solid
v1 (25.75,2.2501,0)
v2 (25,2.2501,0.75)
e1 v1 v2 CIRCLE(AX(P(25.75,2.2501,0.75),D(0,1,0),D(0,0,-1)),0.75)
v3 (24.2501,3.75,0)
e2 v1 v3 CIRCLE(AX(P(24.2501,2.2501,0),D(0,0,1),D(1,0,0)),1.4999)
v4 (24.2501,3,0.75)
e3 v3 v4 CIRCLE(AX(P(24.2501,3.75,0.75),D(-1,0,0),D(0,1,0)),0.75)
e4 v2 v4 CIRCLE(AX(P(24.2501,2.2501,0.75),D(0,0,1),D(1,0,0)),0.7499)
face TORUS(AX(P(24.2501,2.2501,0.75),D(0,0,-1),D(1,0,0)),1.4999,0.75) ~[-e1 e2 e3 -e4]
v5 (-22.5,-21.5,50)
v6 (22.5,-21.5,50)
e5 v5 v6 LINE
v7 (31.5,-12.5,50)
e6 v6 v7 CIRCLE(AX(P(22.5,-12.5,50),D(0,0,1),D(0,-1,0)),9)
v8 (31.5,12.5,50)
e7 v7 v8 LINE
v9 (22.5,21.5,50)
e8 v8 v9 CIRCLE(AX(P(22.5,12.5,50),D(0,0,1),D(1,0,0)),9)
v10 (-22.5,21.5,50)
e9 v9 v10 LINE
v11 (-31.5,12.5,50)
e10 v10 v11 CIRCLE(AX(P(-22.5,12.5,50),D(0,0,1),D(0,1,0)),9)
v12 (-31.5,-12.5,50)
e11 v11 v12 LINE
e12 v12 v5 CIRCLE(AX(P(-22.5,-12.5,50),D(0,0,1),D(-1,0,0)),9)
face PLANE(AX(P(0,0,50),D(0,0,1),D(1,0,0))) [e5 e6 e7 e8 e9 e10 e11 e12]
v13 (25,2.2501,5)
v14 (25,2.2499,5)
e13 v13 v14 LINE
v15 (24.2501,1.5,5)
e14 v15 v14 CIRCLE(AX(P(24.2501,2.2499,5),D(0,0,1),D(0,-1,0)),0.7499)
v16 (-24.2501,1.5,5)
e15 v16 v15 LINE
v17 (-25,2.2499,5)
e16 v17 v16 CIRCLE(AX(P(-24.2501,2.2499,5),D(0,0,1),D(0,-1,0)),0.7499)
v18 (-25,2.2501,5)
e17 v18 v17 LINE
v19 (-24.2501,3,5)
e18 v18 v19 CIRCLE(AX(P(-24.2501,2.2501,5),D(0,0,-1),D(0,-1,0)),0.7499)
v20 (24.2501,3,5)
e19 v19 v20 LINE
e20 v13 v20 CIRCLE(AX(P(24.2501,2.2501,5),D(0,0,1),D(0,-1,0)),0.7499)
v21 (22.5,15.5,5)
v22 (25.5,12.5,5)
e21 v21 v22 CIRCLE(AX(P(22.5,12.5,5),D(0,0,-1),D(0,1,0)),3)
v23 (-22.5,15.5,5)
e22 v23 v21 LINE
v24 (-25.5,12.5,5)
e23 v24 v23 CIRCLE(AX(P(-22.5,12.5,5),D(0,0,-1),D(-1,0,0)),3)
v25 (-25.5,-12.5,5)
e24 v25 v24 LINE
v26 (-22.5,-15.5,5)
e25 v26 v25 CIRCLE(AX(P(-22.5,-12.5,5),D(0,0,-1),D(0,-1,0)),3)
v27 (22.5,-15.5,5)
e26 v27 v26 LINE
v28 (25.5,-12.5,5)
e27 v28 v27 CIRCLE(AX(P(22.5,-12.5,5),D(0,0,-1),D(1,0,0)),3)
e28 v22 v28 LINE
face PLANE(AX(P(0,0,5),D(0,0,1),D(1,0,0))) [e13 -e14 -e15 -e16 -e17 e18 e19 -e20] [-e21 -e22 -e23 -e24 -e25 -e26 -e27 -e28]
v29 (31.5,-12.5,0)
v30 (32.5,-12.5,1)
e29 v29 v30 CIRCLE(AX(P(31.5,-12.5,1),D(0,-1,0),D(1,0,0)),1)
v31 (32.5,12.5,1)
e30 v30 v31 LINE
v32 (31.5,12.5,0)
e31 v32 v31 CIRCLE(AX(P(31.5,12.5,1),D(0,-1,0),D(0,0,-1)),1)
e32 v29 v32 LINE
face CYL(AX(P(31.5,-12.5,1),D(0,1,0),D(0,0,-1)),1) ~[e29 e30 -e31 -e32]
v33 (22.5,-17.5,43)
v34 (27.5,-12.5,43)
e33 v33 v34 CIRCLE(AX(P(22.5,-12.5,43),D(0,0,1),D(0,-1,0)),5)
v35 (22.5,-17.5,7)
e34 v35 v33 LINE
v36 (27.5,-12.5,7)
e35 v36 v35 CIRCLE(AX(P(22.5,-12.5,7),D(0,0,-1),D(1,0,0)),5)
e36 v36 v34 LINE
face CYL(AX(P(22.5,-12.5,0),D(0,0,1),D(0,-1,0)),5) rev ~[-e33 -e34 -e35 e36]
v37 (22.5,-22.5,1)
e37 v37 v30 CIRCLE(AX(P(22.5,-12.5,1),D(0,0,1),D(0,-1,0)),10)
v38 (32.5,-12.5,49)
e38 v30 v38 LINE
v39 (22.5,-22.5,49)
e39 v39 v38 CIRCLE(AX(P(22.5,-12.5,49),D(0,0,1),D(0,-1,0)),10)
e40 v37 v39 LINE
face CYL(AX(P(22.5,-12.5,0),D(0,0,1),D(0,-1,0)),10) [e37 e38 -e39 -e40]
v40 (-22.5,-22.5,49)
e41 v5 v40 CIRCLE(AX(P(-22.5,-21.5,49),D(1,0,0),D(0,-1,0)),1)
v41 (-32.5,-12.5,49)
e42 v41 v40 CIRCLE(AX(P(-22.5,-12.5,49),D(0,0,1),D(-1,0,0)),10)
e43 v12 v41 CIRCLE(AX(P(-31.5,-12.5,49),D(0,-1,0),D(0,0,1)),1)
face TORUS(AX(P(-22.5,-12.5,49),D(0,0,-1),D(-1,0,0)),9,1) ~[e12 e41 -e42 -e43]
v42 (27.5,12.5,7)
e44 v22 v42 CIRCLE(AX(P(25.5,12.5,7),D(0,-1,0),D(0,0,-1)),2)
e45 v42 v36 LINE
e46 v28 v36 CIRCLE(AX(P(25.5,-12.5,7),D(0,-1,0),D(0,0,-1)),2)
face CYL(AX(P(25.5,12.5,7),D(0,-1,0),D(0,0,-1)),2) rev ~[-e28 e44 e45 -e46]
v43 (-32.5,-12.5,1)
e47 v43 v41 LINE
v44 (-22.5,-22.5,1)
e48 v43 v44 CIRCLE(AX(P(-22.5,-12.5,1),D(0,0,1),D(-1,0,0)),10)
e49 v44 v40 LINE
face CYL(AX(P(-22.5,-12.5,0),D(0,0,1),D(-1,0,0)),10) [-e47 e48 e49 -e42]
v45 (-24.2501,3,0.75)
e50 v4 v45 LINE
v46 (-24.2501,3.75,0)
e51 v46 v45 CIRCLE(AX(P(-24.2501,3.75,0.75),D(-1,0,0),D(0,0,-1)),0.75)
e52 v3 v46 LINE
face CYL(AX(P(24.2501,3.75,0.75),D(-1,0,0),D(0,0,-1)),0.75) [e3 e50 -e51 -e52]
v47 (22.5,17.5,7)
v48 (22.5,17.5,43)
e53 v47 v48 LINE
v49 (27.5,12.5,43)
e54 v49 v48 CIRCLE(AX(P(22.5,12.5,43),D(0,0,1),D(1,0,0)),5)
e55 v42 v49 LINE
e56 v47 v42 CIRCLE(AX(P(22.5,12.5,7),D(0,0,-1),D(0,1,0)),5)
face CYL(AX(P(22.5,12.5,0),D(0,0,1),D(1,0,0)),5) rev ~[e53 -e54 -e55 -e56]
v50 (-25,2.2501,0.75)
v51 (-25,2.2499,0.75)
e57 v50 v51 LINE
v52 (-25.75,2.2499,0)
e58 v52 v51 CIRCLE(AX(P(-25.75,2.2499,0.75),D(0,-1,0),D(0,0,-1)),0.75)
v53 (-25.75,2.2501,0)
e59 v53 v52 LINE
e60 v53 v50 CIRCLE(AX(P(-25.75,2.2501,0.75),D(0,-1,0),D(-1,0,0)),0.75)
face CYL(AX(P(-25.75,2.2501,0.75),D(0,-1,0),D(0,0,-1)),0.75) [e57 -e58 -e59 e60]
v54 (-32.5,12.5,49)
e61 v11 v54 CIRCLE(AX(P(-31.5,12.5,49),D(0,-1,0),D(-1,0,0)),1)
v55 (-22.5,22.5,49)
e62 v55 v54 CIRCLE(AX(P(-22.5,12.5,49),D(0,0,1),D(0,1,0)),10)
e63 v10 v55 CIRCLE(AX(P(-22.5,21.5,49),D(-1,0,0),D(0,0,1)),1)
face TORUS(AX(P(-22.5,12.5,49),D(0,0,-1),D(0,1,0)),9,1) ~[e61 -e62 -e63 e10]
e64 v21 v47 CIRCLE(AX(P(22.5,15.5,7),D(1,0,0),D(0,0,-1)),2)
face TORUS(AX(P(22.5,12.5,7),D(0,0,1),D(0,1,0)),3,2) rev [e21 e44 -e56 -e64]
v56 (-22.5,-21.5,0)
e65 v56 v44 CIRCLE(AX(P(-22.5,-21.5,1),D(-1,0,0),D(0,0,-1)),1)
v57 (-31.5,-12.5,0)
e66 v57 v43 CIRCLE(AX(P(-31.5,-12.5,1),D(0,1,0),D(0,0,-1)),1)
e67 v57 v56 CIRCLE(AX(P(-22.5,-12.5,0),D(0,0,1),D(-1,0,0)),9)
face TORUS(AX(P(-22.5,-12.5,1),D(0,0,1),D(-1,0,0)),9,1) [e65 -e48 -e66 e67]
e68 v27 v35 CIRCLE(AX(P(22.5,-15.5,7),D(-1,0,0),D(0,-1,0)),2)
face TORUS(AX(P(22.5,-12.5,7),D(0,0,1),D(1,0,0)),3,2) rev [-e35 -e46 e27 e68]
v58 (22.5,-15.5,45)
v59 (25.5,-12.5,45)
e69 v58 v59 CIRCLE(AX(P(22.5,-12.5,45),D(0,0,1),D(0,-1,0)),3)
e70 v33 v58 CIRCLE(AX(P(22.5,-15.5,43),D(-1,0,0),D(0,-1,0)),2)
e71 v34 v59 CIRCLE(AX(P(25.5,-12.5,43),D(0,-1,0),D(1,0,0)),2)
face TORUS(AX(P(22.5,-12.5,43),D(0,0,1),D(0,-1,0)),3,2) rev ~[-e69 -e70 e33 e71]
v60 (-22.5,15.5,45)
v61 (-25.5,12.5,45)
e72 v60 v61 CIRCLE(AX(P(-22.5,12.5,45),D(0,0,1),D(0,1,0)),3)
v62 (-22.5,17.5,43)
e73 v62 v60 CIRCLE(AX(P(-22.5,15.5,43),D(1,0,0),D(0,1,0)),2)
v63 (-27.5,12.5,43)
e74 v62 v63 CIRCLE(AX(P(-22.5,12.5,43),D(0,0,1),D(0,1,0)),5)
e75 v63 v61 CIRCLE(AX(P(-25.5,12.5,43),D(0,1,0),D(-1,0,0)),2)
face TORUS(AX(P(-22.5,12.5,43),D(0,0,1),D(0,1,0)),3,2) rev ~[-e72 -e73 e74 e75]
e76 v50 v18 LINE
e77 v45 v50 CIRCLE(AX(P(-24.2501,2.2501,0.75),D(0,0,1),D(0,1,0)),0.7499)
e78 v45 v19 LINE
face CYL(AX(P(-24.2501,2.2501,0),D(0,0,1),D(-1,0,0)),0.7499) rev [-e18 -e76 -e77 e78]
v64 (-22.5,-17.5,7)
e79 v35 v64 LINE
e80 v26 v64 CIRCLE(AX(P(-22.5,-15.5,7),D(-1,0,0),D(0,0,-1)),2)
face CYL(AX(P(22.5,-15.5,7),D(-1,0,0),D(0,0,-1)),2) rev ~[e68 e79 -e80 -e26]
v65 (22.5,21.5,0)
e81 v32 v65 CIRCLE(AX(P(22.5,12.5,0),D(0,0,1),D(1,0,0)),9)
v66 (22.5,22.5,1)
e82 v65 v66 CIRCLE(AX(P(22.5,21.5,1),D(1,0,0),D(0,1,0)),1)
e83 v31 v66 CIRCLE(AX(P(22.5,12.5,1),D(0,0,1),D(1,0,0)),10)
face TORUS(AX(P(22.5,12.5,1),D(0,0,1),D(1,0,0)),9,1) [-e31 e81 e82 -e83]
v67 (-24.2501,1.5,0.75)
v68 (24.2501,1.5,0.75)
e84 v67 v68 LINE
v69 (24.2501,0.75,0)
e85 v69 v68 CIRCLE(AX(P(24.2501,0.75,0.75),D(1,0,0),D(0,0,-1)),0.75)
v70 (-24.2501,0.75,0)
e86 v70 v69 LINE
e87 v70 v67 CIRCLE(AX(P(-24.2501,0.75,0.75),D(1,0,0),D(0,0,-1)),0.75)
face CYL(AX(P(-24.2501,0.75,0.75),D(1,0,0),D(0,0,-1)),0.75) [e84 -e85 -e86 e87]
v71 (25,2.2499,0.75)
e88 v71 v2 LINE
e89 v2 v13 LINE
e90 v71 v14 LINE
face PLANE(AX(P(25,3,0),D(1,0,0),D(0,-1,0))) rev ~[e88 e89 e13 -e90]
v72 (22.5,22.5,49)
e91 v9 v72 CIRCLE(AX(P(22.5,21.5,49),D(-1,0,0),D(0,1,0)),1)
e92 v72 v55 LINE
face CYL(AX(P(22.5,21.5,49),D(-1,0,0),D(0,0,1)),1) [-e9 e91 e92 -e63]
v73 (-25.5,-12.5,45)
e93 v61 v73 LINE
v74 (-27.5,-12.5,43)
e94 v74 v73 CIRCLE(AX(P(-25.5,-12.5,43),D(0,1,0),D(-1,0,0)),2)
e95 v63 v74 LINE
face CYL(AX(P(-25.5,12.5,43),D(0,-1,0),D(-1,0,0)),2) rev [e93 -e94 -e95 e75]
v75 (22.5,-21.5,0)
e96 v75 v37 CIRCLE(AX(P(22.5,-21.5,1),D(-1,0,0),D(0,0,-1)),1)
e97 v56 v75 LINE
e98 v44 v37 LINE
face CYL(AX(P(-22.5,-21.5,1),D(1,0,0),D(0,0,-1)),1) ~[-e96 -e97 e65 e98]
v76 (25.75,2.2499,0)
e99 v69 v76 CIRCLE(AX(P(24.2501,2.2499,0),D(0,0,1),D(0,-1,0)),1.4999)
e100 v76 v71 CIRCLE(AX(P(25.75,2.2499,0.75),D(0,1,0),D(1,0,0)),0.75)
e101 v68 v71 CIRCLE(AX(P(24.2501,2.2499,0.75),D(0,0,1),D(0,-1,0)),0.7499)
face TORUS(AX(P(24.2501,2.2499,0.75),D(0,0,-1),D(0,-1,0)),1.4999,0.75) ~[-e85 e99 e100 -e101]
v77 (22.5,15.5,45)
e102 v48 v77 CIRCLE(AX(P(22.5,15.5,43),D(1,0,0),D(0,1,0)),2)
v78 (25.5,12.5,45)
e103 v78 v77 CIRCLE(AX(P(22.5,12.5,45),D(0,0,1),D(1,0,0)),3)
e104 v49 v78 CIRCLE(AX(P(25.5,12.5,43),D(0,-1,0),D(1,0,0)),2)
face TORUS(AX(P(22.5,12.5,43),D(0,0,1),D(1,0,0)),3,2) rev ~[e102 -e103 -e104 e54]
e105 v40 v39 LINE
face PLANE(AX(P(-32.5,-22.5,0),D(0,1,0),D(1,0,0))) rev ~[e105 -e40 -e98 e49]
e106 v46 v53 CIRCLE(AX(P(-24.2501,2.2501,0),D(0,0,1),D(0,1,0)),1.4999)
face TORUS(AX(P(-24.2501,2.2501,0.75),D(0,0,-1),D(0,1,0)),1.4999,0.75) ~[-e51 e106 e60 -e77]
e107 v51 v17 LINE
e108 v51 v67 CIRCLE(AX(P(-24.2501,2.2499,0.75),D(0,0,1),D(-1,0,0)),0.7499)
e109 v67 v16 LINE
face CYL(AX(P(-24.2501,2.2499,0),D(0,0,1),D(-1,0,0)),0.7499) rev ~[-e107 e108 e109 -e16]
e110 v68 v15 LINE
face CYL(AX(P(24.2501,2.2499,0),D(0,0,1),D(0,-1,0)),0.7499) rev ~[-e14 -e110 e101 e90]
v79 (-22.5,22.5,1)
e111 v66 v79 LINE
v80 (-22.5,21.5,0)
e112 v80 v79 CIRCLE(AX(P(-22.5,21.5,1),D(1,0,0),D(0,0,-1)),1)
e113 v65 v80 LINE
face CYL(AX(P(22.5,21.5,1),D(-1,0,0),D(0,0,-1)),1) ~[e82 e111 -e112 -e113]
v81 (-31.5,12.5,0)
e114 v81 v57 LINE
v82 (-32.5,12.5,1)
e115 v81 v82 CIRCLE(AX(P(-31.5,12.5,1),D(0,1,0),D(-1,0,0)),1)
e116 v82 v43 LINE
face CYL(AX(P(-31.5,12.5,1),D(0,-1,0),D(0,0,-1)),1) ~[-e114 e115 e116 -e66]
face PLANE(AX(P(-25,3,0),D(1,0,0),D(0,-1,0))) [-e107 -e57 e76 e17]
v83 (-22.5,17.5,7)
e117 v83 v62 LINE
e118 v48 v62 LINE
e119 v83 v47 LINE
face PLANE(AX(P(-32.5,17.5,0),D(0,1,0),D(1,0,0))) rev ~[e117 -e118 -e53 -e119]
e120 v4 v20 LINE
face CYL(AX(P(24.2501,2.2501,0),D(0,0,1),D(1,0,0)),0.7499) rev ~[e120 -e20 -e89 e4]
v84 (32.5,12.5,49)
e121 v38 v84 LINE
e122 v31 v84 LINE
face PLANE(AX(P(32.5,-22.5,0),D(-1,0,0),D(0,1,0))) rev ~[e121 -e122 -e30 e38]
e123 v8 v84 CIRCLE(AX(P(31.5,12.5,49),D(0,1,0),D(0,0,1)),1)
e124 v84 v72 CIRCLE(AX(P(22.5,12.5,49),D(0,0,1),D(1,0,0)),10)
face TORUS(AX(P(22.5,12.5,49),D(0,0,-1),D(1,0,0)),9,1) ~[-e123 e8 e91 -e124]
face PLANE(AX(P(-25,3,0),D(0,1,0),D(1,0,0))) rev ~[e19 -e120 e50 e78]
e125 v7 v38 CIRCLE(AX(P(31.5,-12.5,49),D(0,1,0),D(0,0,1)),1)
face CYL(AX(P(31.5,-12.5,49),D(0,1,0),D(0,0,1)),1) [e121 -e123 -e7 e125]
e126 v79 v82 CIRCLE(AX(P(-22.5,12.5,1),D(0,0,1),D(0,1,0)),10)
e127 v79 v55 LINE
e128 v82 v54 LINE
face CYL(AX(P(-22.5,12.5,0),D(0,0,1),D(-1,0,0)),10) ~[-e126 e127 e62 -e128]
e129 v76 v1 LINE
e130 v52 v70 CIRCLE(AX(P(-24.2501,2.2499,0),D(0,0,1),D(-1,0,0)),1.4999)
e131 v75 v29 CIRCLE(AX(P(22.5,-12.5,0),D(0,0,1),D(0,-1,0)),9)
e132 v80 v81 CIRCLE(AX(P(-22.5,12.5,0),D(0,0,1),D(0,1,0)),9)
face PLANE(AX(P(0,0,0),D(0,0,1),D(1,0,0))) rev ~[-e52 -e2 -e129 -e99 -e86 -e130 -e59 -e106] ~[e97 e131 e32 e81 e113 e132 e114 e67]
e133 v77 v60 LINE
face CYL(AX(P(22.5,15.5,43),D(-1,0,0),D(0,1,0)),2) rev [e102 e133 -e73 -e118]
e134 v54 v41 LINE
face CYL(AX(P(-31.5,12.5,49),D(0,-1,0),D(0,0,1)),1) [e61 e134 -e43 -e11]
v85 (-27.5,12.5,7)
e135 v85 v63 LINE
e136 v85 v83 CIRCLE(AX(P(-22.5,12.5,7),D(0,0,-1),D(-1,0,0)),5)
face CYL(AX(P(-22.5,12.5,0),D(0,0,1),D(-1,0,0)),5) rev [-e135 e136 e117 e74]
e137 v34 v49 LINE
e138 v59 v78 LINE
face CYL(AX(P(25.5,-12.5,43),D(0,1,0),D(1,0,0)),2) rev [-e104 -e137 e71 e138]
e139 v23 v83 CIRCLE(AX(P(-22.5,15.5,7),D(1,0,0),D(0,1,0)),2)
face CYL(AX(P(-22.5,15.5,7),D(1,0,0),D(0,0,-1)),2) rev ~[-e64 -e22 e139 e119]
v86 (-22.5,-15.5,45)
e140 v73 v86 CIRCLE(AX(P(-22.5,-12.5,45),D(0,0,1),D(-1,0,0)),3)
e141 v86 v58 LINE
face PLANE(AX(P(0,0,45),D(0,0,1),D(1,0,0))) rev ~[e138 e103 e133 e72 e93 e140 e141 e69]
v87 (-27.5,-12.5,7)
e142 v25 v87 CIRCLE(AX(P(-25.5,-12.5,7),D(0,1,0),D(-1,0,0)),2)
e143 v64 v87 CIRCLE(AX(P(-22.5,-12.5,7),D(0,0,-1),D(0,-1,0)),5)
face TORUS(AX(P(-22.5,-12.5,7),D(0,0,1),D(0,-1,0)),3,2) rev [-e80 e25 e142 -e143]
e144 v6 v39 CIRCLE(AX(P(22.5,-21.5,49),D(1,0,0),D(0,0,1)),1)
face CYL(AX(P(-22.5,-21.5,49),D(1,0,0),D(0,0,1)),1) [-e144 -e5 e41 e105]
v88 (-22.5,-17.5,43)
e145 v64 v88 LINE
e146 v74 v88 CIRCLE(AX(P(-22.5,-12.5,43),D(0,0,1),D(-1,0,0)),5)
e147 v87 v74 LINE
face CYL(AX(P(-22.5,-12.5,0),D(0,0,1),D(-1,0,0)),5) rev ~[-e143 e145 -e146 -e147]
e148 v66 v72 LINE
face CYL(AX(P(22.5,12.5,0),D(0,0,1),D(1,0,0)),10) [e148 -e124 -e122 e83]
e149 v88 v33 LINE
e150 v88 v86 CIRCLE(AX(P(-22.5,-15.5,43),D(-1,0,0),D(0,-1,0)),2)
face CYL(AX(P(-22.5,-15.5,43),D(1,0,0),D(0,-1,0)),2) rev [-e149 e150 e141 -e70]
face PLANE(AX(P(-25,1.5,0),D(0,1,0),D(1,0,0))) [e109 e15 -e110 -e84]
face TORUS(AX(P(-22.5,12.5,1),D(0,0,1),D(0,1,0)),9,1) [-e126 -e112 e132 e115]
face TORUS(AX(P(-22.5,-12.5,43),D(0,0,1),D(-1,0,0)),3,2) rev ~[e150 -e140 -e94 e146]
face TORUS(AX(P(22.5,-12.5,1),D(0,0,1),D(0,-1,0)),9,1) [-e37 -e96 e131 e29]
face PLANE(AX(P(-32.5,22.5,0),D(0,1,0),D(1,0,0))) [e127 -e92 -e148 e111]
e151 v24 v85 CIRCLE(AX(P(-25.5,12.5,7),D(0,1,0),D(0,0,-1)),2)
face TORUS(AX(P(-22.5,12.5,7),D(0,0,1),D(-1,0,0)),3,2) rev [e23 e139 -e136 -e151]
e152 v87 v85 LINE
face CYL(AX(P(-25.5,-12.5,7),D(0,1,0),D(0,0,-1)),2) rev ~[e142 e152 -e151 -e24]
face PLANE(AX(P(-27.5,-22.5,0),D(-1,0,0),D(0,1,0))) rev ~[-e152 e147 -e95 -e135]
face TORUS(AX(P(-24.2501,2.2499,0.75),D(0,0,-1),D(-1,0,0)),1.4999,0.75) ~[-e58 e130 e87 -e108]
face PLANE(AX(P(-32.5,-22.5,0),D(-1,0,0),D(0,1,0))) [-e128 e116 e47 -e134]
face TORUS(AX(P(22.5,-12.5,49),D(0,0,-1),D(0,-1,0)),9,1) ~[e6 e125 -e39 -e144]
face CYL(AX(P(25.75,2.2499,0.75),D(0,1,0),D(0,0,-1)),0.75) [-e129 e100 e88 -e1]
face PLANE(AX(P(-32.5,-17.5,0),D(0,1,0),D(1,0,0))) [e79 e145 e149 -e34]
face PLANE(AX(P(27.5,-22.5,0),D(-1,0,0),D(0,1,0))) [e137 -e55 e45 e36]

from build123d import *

# Parameters (mm, degrees)
F0_W     = 65
F0_H     = 45
F1_DEPTH = 50
F2_R     = 10
F3_T     = -5
F4_W     = 50
F4_H     = 1.5
F5_DEPTH = 5
F6_R     = 1
F7_F1_R  = 0.7499
F7_F2_R  = 0.75
F8_R     = 2


# Not quite as in the source:
# - a fillet or chamfer is up to 0.001 mm smaller than in the source, because OpenCascade refuses the exact size


with BuildPart() as f1:
    # F0 (on Top) → F1 (new body)
    with BuildSketch(Plane.XY):
        Rectangle(F0_W, F0_H)
    extrude(amount=F1_DEPTH)

    # F2
    f2_edges = [f1.edges().sort_by_distance(p)[0] for p in [
        (32.5, -22.5, 25),
        (-32.5, -22.5, 25),
        (-32.5, 22.5, 25),
        (32.5, 22.5, 25),
    ]]
    fillet(f2_edges, radius=F2_R)

    # F3 (hollow: no face is removed)
    offset(amount=F3_T, mode=Mode.SUBTRACT)

    # F4 (on face) → F5 (cut, through all)
    with BuildSketch(Plane(origin=(0, 0, 0), x_dir=(1, 0, 0), z_dir=(0, 0, -1))):
        with Locations((0, -2.25)):
            Rectangle(F4_W, F4_H)
    extrude(amount=-F5_DEPTH, mode=Mode.SUBTRACT)

    # F6
    f6_edges = [f1.edges().sort_by_distance(p)[0] for p in [
        (0, -22.5, 0),
        (32.5, 0, 50),
        (29.571068, -19.571068, 50),
        (29.571068, 19.571068, 50),
        (0, -22.5, 50),
        (0, 22.5, 50),
        (-29.571068, -19.571068, 50),
        (-29.571068, 19.571068, 50),
        (-32.5, 0, 50),
        (32.5, 0, 0),
        (29.571068, -19.571068, 0),
        (29.571068, 19.571068, 0),
        (0, 22.5, 0),
        (-29.571068, -19.571068, 0),
        (-29.571068, 19.571068, 0),
        (-32.5, 0, 0),
    ]]
    fillet(f6_edges, radius=F6_R)

    # F7: fillet of radius 0.75 on 6 edges, made by hand

    # F7_f1 (radius 0.75 in the source; OpenCascade refuses exactly that, so slightly less here)
    f7_f1_edges = [f1.edges().sort_by_distance(p)[0] for p in [
        (-25, 1.5, 2.5),
        (-25, 3, 2.5),
        (25, 3, 2.5),
        (25, 1.5, 2.5),
    ]]
    fillet(f7_f1_edges, radius=F7_F1_R)

    # F7_f2
    f7_f2_edges = [f1.edges().sort_by_distance(p)[0] for p in [
        (0, 1.5, 0),
        (0, 3, 0),
        (-24.7803593752, 2.7803593752, 0),
        (24.7803593752, 2.7803593752, 0),
        (24.7803593752, 1.7196406248, 0),
        (-24.7803593752, 1.7196406248, 0),
    ]]
    fillet(f7_f2_edges, radius=F7_F2_R)

    # F8
    f8_edges = [f1.edges().sort_by_distance(p)[0] for p in [
        (27.5, 0, 5),
        (0, 17.5, 45),
        (26.035534, 16.035534, 5),
        (26.035534, -16.035534, 5),
        (0, 17.5, 5),
        (0, -17.5, 5),
        (-26.035534, 16.035534, 5),
        (-26.035534, -16.035534, 5),
        (-27.5, 0, 5),
        (27.5, 0, 45),
        (26.035534, 16.035534, 45),
        (26.035534, -16.035534, 45),
        (0, -17.5, 45),
        (-26.035534, 16.035534, 45),
        (-26.035534, -16.035534, 45),
        (-27.5, 0, 45),
    ]]
    fillet(f8_edges, radius=F8_R)


solid = f1.part
